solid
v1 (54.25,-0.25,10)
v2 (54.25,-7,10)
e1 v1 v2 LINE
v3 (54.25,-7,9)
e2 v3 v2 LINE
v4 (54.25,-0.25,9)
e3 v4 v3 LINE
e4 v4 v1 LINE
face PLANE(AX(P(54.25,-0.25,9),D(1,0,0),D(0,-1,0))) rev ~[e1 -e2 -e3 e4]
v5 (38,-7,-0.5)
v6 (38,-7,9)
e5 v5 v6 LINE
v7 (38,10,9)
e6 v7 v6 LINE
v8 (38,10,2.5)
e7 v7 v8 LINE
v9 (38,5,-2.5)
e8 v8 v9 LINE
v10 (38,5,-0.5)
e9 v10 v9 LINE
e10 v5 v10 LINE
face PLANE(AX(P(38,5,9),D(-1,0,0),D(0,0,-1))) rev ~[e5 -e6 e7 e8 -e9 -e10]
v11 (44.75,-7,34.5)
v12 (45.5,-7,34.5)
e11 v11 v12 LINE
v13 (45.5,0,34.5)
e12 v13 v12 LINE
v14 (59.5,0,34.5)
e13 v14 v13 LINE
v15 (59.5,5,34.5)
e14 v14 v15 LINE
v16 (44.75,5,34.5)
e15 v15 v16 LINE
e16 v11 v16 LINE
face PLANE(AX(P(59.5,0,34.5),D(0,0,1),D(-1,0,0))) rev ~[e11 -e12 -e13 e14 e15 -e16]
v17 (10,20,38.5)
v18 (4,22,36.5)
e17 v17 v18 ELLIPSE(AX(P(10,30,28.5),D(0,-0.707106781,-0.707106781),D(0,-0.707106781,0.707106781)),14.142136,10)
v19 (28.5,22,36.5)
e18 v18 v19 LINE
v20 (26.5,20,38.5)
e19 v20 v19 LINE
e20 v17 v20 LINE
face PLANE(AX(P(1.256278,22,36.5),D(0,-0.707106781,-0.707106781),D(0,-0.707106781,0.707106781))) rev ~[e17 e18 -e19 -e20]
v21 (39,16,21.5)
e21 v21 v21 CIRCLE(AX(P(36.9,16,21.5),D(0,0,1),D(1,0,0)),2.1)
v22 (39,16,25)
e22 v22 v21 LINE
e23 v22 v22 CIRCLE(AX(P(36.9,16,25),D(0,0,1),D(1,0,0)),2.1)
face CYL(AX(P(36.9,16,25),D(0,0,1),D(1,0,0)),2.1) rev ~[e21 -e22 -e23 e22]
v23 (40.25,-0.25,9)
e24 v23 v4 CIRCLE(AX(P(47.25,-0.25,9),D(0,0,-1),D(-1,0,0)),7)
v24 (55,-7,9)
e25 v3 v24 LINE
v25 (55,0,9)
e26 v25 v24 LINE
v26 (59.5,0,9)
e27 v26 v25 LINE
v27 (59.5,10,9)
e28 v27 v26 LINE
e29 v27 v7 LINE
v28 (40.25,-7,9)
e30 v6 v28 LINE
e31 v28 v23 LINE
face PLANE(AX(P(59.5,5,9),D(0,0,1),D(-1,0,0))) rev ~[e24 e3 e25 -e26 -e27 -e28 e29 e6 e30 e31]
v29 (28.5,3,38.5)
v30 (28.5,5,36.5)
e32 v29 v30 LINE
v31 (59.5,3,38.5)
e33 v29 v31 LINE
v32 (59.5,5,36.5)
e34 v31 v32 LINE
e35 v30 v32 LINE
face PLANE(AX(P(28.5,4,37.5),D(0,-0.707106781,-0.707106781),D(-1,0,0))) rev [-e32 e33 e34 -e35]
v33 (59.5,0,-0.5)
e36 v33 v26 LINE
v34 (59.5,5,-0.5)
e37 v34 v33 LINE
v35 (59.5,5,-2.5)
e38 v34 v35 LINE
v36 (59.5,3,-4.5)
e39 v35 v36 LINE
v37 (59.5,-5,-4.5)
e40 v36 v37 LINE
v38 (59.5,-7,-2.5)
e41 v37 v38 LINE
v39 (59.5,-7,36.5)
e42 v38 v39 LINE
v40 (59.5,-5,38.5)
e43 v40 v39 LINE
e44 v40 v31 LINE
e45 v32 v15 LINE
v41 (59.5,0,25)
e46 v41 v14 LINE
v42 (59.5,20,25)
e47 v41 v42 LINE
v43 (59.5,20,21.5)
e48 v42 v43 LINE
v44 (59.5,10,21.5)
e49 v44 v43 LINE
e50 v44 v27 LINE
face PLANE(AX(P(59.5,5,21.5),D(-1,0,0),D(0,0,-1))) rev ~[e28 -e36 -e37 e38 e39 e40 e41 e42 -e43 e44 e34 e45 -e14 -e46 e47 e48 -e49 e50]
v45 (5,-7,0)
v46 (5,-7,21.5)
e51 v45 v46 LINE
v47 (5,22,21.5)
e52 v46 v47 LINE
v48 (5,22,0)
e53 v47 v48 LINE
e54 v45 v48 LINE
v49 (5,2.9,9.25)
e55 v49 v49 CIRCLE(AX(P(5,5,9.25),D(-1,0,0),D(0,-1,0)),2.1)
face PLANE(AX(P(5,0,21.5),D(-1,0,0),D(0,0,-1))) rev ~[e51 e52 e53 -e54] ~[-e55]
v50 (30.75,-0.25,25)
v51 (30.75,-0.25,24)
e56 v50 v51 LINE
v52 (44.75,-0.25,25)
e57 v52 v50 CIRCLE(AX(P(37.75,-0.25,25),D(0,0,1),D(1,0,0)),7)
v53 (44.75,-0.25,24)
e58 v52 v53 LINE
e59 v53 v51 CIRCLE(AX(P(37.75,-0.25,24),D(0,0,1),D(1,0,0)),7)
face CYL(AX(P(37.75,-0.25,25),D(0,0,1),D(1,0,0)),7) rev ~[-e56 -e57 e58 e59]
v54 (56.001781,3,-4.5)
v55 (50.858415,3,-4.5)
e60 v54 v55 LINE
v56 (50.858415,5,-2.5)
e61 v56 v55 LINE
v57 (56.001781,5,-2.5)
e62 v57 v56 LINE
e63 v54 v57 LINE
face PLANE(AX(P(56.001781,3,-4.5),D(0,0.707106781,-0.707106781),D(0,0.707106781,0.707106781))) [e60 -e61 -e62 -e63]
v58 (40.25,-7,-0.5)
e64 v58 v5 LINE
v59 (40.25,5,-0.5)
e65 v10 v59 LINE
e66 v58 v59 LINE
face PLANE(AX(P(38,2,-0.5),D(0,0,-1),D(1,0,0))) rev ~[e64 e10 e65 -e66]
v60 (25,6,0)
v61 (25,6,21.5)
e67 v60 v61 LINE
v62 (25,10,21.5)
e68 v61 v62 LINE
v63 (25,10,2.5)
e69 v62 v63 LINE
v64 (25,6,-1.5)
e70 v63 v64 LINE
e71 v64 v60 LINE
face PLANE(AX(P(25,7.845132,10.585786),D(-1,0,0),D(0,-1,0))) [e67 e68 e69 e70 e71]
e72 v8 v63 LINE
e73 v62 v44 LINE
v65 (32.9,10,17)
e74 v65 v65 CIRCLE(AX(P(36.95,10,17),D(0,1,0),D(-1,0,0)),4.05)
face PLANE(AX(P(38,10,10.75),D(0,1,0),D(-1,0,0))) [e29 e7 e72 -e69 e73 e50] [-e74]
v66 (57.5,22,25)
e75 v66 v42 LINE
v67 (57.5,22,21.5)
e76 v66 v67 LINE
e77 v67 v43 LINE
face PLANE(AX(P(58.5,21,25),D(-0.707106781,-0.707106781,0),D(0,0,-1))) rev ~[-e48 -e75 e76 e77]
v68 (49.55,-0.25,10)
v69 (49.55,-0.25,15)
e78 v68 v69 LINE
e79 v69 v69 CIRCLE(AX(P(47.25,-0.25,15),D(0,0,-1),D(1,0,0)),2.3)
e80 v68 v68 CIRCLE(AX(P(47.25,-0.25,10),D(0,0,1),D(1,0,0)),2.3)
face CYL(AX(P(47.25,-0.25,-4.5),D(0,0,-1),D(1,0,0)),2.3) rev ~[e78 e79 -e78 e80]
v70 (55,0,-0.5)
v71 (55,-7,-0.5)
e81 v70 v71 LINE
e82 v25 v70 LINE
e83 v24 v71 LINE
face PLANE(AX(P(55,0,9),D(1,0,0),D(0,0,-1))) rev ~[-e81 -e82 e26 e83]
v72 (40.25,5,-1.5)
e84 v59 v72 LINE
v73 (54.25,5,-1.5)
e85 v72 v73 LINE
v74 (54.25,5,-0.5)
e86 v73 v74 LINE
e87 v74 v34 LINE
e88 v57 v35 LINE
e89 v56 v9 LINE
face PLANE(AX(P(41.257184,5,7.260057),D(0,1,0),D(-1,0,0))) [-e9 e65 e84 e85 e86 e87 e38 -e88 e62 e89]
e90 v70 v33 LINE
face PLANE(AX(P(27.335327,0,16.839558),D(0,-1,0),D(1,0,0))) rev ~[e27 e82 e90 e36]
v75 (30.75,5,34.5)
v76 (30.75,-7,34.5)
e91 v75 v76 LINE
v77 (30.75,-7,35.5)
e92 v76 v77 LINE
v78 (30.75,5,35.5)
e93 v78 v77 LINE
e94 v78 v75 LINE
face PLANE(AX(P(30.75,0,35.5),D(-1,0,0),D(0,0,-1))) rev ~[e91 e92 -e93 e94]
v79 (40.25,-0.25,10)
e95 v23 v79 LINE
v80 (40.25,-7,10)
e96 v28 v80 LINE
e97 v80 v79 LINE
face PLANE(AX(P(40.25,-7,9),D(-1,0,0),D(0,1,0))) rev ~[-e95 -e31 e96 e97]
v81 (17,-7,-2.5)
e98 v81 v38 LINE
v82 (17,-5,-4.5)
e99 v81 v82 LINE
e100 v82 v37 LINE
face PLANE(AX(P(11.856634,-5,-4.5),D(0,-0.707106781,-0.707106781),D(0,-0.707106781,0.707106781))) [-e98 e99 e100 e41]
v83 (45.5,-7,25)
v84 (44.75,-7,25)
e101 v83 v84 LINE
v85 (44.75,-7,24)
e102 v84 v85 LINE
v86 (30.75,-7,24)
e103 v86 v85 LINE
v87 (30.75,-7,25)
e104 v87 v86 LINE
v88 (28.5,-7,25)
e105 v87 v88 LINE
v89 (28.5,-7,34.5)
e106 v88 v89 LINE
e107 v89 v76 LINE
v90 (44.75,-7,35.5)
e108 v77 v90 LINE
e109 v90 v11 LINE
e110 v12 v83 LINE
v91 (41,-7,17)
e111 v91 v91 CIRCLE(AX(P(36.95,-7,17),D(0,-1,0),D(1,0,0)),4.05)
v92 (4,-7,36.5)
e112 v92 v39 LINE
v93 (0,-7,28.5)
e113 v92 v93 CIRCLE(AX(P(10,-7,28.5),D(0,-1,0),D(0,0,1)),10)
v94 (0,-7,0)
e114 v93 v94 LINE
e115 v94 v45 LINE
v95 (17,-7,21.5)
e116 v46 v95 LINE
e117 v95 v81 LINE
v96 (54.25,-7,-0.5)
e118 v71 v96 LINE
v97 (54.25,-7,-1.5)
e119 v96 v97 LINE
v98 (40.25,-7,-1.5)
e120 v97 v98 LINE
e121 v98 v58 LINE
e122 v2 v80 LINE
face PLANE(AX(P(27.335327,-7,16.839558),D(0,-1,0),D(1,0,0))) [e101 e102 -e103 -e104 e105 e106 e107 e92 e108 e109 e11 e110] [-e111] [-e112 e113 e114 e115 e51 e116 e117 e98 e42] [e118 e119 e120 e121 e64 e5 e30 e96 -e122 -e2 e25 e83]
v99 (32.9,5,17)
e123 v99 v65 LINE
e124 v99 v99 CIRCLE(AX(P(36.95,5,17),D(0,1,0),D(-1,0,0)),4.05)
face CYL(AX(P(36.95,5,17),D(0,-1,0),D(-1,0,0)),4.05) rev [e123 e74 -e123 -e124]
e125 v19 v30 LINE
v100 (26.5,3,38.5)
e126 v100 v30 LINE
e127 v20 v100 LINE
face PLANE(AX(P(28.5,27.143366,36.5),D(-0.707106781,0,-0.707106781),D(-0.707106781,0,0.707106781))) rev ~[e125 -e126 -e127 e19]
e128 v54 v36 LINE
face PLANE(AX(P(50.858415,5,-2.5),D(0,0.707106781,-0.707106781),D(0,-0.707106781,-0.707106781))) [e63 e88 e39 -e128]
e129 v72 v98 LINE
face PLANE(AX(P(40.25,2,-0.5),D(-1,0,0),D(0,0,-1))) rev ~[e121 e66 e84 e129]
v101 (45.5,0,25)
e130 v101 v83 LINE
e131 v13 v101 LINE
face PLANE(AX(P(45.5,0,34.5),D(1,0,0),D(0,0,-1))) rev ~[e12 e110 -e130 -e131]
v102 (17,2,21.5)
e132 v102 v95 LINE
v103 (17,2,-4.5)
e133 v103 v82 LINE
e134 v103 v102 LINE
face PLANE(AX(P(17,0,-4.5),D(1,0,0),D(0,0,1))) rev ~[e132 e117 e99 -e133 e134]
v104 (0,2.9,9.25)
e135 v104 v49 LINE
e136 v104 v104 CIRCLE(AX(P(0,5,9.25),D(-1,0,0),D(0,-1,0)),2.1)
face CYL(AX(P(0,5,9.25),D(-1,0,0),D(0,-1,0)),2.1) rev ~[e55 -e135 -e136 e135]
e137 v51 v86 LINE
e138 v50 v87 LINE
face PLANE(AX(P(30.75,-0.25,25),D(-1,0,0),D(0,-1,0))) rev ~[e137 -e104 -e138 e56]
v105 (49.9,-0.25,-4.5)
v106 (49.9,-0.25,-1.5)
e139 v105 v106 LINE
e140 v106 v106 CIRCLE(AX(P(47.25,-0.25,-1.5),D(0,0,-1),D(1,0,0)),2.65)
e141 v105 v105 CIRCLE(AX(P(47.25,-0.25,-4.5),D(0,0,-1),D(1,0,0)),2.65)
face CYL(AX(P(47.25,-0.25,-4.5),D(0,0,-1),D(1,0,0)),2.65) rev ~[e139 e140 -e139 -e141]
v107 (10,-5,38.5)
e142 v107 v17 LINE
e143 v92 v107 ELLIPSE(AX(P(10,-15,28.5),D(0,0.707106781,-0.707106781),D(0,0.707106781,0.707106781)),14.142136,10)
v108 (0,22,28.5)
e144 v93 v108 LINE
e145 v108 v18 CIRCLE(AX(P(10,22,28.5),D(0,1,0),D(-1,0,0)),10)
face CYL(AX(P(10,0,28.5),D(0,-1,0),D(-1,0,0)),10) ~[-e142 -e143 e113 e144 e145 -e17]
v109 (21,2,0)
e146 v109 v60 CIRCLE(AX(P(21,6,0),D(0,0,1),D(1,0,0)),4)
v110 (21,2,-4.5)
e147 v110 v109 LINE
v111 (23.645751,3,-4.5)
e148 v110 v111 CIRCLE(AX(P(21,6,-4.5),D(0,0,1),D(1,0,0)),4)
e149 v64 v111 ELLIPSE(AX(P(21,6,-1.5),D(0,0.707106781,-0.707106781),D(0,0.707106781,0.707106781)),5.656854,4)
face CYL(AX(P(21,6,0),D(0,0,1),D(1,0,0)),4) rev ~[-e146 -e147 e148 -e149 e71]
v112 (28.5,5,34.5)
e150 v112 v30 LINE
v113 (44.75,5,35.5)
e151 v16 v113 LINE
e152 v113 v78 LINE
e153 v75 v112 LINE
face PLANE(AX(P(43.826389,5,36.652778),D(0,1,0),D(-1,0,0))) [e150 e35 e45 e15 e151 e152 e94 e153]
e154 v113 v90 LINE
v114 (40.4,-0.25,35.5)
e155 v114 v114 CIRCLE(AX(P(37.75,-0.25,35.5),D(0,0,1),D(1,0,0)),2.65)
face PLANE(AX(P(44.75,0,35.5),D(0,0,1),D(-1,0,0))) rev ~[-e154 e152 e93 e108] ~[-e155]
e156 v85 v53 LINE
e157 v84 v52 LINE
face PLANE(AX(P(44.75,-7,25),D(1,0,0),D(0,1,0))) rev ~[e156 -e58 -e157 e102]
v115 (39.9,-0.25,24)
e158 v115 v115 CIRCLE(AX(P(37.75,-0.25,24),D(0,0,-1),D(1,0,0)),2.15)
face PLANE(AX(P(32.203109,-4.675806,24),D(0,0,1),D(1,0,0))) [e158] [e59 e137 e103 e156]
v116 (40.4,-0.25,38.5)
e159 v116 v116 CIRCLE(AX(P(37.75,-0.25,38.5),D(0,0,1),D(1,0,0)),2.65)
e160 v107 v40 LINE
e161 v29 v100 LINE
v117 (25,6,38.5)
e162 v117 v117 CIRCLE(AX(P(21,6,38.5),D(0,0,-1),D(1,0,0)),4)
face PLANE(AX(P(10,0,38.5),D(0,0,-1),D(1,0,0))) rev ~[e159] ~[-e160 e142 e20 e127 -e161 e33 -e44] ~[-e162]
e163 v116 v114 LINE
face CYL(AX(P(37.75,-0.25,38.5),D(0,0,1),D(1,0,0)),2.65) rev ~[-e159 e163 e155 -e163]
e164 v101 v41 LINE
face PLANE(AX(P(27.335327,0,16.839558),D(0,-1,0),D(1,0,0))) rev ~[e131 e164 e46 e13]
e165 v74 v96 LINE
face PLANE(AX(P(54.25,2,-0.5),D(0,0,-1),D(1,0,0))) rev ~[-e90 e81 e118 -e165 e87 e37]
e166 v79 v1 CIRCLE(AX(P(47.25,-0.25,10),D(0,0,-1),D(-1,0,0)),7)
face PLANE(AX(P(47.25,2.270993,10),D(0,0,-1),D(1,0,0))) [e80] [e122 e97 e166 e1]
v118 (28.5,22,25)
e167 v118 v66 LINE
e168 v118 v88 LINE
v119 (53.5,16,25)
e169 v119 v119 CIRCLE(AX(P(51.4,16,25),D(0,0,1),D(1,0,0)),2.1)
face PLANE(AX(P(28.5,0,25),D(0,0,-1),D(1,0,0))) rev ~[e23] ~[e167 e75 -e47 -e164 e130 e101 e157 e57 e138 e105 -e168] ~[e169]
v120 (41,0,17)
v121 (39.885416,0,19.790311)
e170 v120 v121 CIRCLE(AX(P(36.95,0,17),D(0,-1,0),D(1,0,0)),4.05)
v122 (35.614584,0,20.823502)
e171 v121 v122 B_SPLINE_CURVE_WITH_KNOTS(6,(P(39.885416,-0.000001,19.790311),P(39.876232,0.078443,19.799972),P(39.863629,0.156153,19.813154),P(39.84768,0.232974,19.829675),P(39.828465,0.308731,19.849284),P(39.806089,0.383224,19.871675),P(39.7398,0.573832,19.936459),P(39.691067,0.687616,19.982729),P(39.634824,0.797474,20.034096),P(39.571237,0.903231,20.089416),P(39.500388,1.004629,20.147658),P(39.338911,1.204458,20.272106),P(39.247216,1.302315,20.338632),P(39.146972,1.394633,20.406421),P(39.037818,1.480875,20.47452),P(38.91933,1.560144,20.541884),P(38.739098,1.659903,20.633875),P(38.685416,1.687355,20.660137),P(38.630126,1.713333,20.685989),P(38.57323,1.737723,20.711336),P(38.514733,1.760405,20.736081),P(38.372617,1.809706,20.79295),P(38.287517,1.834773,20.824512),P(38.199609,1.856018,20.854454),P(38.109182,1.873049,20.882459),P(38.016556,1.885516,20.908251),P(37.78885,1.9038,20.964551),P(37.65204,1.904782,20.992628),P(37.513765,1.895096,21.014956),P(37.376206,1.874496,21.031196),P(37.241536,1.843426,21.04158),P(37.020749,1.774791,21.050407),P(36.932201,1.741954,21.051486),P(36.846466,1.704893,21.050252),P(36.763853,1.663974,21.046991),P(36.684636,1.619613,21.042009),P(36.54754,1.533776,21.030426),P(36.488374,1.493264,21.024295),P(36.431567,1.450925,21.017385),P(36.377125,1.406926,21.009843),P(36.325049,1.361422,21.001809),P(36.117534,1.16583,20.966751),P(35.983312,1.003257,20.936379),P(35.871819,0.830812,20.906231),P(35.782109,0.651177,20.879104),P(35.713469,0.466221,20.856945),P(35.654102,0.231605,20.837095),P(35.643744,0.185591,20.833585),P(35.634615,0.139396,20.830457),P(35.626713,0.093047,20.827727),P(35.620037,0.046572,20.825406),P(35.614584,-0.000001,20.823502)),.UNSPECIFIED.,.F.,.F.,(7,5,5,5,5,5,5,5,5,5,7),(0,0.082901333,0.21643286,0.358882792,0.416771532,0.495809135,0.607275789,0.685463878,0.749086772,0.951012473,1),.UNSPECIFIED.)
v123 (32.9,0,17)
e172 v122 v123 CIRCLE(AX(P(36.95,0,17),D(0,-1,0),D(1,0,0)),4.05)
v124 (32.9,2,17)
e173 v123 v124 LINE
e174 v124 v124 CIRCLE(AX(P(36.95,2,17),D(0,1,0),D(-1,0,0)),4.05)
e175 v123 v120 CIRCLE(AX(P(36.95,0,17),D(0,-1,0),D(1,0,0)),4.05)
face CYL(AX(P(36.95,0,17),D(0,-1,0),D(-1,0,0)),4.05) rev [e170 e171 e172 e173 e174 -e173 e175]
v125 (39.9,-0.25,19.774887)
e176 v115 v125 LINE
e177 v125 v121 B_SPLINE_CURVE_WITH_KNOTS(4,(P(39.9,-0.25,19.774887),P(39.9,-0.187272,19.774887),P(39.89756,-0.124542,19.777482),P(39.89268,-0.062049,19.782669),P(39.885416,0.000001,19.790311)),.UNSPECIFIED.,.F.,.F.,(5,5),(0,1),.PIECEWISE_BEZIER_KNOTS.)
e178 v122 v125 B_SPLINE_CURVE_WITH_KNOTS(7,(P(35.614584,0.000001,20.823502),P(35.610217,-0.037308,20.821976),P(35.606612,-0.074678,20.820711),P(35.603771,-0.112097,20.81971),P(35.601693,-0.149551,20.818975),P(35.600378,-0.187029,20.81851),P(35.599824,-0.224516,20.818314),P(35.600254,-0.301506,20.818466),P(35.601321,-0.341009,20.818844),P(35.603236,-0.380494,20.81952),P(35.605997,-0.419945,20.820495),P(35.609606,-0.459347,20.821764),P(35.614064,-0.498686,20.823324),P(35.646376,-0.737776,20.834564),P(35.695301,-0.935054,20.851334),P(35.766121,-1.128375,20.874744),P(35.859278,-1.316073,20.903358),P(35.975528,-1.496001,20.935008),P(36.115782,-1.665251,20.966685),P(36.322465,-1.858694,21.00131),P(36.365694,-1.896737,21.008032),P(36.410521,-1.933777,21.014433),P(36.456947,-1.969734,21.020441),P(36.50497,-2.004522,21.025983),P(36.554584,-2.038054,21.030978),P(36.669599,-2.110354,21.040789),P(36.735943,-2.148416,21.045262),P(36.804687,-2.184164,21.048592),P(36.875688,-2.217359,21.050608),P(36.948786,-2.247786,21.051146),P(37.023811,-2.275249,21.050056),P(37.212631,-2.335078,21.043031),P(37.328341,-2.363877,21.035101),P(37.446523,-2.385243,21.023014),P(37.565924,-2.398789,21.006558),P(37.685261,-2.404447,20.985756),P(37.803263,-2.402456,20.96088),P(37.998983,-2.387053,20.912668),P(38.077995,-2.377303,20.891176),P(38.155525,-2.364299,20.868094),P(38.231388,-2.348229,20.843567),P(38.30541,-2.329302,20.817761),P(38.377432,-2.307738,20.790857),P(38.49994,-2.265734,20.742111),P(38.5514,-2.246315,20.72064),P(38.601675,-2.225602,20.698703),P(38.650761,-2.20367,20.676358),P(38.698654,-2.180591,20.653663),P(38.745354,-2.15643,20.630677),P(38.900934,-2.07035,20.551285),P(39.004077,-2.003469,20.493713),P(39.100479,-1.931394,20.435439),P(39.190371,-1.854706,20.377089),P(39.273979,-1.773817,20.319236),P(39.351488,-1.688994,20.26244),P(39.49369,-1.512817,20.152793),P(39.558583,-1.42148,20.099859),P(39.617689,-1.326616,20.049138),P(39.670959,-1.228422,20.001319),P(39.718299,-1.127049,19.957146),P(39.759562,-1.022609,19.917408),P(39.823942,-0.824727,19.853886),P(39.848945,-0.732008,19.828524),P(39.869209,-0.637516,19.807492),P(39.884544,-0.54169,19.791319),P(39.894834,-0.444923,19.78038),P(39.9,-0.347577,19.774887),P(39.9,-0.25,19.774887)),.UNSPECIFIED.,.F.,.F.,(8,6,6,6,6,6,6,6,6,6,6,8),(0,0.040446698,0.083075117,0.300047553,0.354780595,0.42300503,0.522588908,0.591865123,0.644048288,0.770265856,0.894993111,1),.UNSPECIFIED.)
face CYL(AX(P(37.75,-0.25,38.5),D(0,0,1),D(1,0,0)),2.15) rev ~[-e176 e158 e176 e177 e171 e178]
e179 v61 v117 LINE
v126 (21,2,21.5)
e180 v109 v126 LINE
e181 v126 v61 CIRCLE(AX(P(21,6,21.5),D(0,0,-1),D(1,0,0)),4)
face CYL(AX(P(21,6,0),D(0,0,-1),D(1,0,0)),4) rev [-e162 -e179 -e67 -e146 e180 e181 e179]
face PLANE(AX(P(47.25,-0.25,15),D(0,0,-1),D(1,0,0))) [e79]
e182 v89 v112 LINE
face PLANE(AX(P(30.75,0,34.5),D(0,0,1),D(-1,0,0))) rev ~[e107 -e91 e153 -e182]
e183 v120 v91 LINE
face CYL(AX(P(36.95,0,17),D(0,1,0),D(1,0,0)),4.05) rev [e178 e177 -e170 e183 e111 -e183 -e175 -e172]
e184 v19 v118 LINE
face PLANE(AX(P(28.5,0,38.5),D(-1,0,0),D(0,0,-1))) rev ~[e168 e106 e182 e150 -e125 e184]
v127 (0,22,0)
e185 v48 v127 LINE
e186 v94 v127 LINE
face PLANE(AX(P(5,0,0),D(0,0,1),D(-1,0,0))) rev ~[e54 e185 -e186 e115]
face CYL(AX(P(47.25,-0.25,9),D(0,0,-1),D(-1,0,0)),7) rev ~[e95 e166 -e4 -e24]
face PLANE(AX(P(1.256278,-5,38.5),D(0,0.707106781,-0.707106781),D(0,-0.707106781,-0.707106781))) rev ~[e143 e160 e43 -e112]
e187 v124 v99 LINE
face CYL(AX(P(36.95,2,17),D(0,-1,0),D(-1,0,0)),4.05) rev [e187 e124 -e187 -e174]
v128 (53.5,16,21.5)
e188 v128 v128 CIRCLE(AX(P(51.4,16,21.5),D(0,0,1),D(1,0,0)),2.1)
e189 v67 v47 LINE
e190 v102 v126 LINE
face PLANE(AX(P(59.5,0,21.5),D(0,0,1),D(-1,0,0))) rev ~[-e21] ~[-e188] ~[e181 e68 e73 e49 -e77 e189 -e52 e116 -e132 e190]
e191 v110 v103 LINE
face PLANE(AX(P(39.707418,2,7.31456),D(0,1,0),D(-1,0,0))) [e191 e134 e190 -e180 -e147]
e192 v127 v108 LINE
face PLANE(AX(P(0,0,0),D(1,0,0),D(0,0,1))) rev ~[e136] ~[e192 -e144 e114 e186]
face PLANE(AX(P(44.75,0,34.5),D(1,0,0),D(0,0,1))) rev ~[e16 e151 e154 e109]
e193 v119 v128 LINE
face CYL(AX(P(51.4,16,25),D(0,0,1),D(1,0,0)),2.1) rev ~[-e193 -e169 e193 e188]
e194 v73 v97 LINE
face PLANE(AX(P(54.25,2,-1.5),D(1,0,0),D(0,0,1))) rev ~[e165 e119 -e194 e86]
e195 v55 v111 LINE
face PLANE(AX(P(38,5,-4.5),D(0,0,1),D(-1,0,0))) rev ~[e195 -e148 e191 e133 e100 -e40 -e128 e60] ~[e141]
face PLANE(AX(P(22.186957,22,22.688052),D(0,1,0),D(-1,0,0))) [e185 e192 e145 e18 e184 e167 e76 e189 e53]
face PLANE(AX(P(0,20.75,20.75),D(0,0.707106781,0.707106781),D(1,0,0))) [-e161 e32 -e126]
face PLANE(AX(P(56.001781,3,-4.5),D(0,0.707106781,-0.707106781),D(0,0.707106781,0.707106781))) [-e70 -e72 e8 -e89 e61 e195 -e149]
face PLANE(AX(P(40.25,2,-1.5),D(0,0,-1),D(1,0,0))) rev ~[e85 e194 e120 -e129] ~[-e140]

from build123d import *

# Parameters (mm, degrees)
F0_R           = 4.05
F1_DEPTH       = 7
F2_T1_DEPTH    = 63.387088135
F2_T3_DEPTH    = 52.7867319519
F4_DEPTH       = 22
F6_DEPTH       = 5
F7_R           = 4.05
F8_DEPTH       = 2
F9_R           = 4.05
F10_DEPTH      = 3
F11_R          = 4.05
F12_DEPTH      = 5
F13_T4_DEPTH   = 53.0035618315
F14_SIZE       = 2
F17_DEPTH      = 4
F15_R          = 4
F18_DEPTH      = 4.501
F18_DEPTH_BACK = 38.501
F19_R          = 2.3
F20_DEPTH      = 19.5
F21_R          = 2.65
F21_R_2        = 2.3
F22_DEPTH      = 3
F23_R          = 2.15
F24_DEPTH      = 22
F25_R          = 2.65
F25_R_2        = 2.15
F26_DEPTH      = 3
F28_DEPTH      = 1
F30_DEPTH      = 1
F31_R          = 2.1
F32_DEPTH      = 29.501
F33_T1_DEPTH   = 32.387088135
F33_T3_DEPTH   = 13.7849510361
F33_T8_DEPTH   = 29.2867319519
F34_R          = 2.1
F35_DEPTH      = 5


# Not quite as in the source:
# - a fillet or chamfer that OpenCascade refuses, or shapes differently, is made with other operations: its cross-section is extruded or revolved along the edge and cut away or added


with BuildPart() as f1:
    # F0 (on Front) → F1 (new body)
    with BuildSketch(Plane.XZ):
        with BuildLine():
            Line((0, 28.5), (0, 0))
            Line((0, 0), (5, 0))
            Line((5, 0), (5, 21.5))
            Line((5, 21.5), (17, 21.5))
            Line((17, 21.5), (17, -4.5))
            Line((17, -4.5), (59.5, -4.5))
            Line((59.5, -4.5), (59.5, 38.5))
            Line((59.5, 38.5), (10, 38.5))
            ThreePointArc((10, 38.5), (2.9289321881, 35.5710678119), (0, 28.5))
        make_face()
        Polygon((38, -0.5), (38, 9), (55, 9), (55, -0.5), (54.25, -0.5), (54.25, -1.5), (40.25, -1.5), (40.25, -0.5), align=None, mode=Mode.SUBTRACT)
        with Locations((36.95, 17)):
            Circle(F0_R, mode=Mode.SUBTRACT)
        Polygon((28.5, 25), (28.5, 34.5), (30.75, 34.5), (30.75, 35.5), (44.75, 35.5), (44.75, 34.5), (45.5, 34.5), (45.5, 25), align=None, mode=Mode.SUBTRACT)
    extrude(amount=F1_DEPTH)

    # F2: chamfer of 2 on 2 edges, made by hand

    # F2_s2 → F2_t1 (cut)
    with BuildSketch(Plane.YZ.offset(1.2562778409)):
        Polygon((-5, 38.5), (-7, 36.5), (-7, 38.5), align=None)
    extrude(amount=F2_T1_DEPTH, mode=Mode.SUBTRACT)

    # F2_s4 → F2_t3 (cut)
    with BuildSketch(Plane.YZ.offset(11.8566340241)):
        Polygon((-5, -4.5), (-7, -2.5), (-7, -4.5), align=None)
    extrude(amount=F2_T3_DEPTH, mode=Mode.SUBTRACT)

    # F3 (on face) → F4 (join)
    with BuildSketch(Plane(origin=(0, 0, 0), x_dir=(-1, 0, 0), z_dir=(0, 1, 0))):
        with BuildLine():
            Line((-59.5, 21.5), (-17, 21.5))
            Line((-17, 21.5), (-5, 21.5))
            Line((-5, 21.5), (-5, 0))
            Line((-5, 0), (0, 0))
            Line((0, 0), (0, 28.5))
            ThreePointArc((0, 28.5), (-2.9289321881, 35.5710678119), (-10, 38.5))
            Line((-10, 38.5), (-28.5, 38.5))
            Line((-28.5, 38.5), (-28.5, 34.5))
            Line((-28.5, 34.5), (-28.5, 25))
            Line((-28.5, 25), (-45.5, 25))
            Line((-45.5, 25), (-59.5, 25))
            Line((-59.5, 25), (-59.5, 21.5))
        make_face()
    extrude(amount=F4_DEPTH)

    # F5 (on face) → F6 (join)
    with BuildSketch(Plane(origin=(0, 0, 0), x_dir=(-1, 0, 0), z_dir=(0, 1, 0))):
        Polygon((-30.75, 34.5), (-28.5, 34.5), (-28.5, 38.5), (-59.5, 38.5), (-59.5, 34.5), (-45.5, 34.5), (-44.75, 34.5), (-44.75, 35.5), (-30.75, 35.5), align=None)
    extrude(amount=F6_DEPTH)

    # F7 (on face) → F8 (join)
    with BuildSketch(Plane(origin=(0, 0, 0), x_dir=(-1, 0, 0), z_dir=(0, 1, 0))):
        Polygon((-38, 9), (-38, -0.5), (-40.25, -0.5), (-40.25, -1.5), (-54.25, -1.5), (-54.25, -0.5), (-55, -0.5), (-59.5, -0.5), (-59.5, -4.5), (-17, -4.5), (-17, 21.5), (-59.5, 21.5), (-59.5, 9), (-55, 9), align=None)
        with Locations((-36.95, 17)):
            Circle(F7_R, mode=Mode.SUBTRACT)
    extrude(amount=F8_DEPTH)

    # F9 (on face) → F10 (join)
    with BuildSketch(Plane(origin=(0, 2, 0), x_dir=(-1, 0, 0), z_dir=(0, 1, 0))):
        Polygon((-21, -4.5), (-21, 21.5), (-59.5, 21.5), (-59.5, 9), (-38, 9), (-38, -0.5), (-40.25, -0.5), (-40.25, -1.5), (-54.25, -1.5), (-54.25, -0.5), (-59.5, -0.5), (-59.5, -4.5), align=None)
        with Locations((-36.95, 17)):
            Circle(F9_R, mode=Mode.SUBTRACT)
    extrude(amount=F10_DEPTH)

    # F11 (on face) → F12 (join)
    with BuildSketch(Plane(origin=(0, 5, 0), x_dir=(-1, 0, 0), z_dir=(0, 1, 0))):
        Polygon((-38, 9), (-38, -0.5), (-38, -4.5), (-21, -4.5), (-21, 21.5), (-59.5, 21.5), (-59.5, 9), align=None)
        with Locations((-36.95, 17)):
            Circle(F11_R, mode=Mode.SUBTRACT)
    extrude(amount=F12_DEPTH)

    # F13: chamfer of 7 on 1 edges, made by hand


with BuildPart() as f13_tool2:
    # F13_s3 → F13_t4 (new body)
    with BuildSketch(Plane.YZ.offset(56.0017809158)):
        Polygon((3, -4.5), (10, 2.5), (10, -4.5), align=None)
    extrude(amount=-F13_T4_DEPTH)

    split(bisect_by=Plane.YZ.offset(5), keep=Keep.TOP)


with BuildPart() as f1_1:
    add(f1.part)

    # F13_t1: cut F13_tool2
    add(f13_tool2.part, mode=Mode.SUBTRACT)

    # F14
    f14_edges = [f1_1.edges().sort_by_distance(p)[0] for p in [
        (44, 5, 38.5),
        (59.5, 22, 23.25),
    ]]
    chamfer(f14_edges, length=F14_SIZE)

    # F16 (on face) → F17 (cut)
    with BuildSketch(Plane(origin=(21, 0, 0), x_dir=(0, -1, 0), z_dir=(-1, 0, 0))):
        Polygon((-6, 21.5), (-10, 21.5), (-10, 2.5), (-6, -1.5), align=None)
    extrude(amount=-F17_DEPTH, mode=Mode.SUBTRACT)

    # F15 (on Top) → F18 (cut, two sides)
    with BuildSketch(Plane.XY) as f18_sk:
        with Locations((21, 6)):
            Circle(F15_R)
    extrude(amount=-F18_DEPTH, mode=Mode.SUBTRACT)
    extrude(f18_sk.sketch, amount=F18_DEPTH_BACK, mode=Mode.SUBTRACT)

    # F19 (on face) → F20 (cut)
    with BuildSketch(Plane(origin=(0, 0, -4.5), x_dir=(1, 0, 0), z_dir=(0, 0, -1))):
        with Locations((47.25, 0.25)):
            Circle(F19_R)
    extrude(amount=-F20_DEPTH, mode=Mode.SUBTRACT)

    # F21 (on face) → F22 (cut, through all)
    with BuildSketch(Plane(origin=(0, 0, -4.5), x_dir=(1, 0, 0), z_dir=(0, 0, -1))):
        with Locations((47.25, 0.25)):
            Circle(F21_R)
        with Locations((47.25, 0.25)):
            Circle(F21_R_2, mode=Mode.SUBTRACT)
    extrude(amount=-F22_DEPTH, mode=Mode.SUBTRACT)

    # F23 (on face) → F24 (cut)
    with BuildSketch(Plane.XY.offset(38.5)):
        with Locations((37.75, -0.25)):
            Circle(F23_R)
    extrude(amount=-F24_DEPTH, mode=Mode.SUBTRACT)

    # F25 (on face) → F26 (cut, through all)
    with BuildSketch(Plane.XY.offset(38.5)):
        with Locations((37.75, -0.25)):
            Circle(F25_R)
        with Locations((37.75, -0.25)):
            Circle(F25_R_2, mode=Mode.SUBTRACT)
    extrude(amount=-F26_DEPTH, mode=Mode.SUBTRACT)

    # F27 (on face) → F28 (cut)
    with BuildSketch(Plane.XY.offset(25)):
        with BuildLine():
            ThreePointArc((35.8959503782, -7), (32.1832079546, -4.4939163898), (30.75, -0.25))
            Line((30.75, -0.25), (30.75, -7))
            Line((30.75, -7), (35.8959503782, -7))
        make_face()
        with BuildLine():
            ThreePointArc((39.6040496218, -7), (43.3167920454, -4.4939163898), (44.75, -0.25))
            Line((44.75, -0.25), (39.9, -0.25))
            ThreePointArc((39.9, -0.25), (37.75, -2.4), (35.6, -0.25))
            Line((35.6, -0.25), (30.75, -0.25))
            ThreePointArc((30.75, -0.25), (32.1832079546, -4.4939163898), (35.8959503782, -7))
            Line((35.8959503782, -7), (39.6040496218, -7))
        make_face()
        with BuildLine():
            Line((39.9, -0.25), (44.75, -0.25))
            ThreePointArc((44.75, -0.25), (37.75, 6.75), (30.75, -0.25))
            Line((30.75, -0.25), (35.6, -0.25))
            ThreePointArc((35.6, -0.25), (37.75, 1.9), (39.9, -0.25))
        make_face()
        with BuildLine():
            Line((44.75, -7), (44.75, -0.25))
            ThreePointArc((44.75, -0.25), (43.3167920454, -4.4939163898), (39.6040496218, -7))
            Line((39.6040496218, -7), (44.75, -7))
        make_face()
    extrude(amount=-F28_DEPTH, mode=Mode.SUBTRACT)

    # F29 (on face) → F30 (cut)
    with BuildSketch(Plane(origin=(0, 0, 9), x_dir=(1, 0, 0), z_dir=(0, 0, -1))):
        with BuildLine():
            Line((44.95, 0.25), (40.25, 0.25))
            ThreePointArc((40.25, 0.25), (47.25, -6.75), (54.25, 0.25))
            Line((54.25, 0.25), (49.55, 0.25))
            ThreePointArc((49.55, 0.25), (47.25, -2.05), (44.95, 0.25))
        make_face()
        with BuildLine():
            ThreePointArc((45.3959503782, 7), (41.6832079546, 4.4939163898), (40.25, 0.25))
            Line((40.25, 0.25), (44.95, 0.25))
            ThreePointArc((44.95, 0.25), (47.25, 2.55), (49.55, 0.25))
            Line((49.55, 0.25), (54.25, 0.25))
            ThreePointArc((54.25, 0.25), (52.8167920454, 4.4939163898), (49.1040496218, 7))
            Line((49.1040496218, 7), (45.3959503782, 7))
        make_face()
        with BuildLine():
            Line((40.25, 7), (40.25, 0.25))
            ThreePointArc((40.25, 0.25), (41.6832079546, 4.4939163898), (45.3959503782, 7))
            Line((45.3959503782, 7), (40.25, 7))
        make_face()
        with BuildLine():
            ThreePointArc((49.1040496218, 7), (52.8167920454, 4.4939163898), (54.25, 0.25))
            Line((54.25, 0.25), (54.25, 7))
            Line((54.25, 7), (49.1040496218, 7))
        make_face()
    extrude(amount=-F30_DEPTH, mode=Mode.SUBTRACT)

    # F31 (on face) → F32 (cut, through all)
    with BuildSketch(Plane.XY.offset(25)):
        with Locations((36.9, 16)):
            Circle(F31_R)
        with Locations((51.4, 16)):
            Circle(F31_R)
    extrude(amount=-F32_DEPTH, mode=Mode.SUBTRACT)

    # F33: chamfer of 2 on 3 edges, made by hand

    # F33_s2 → F33_t1 (cut)
    with BuildSketch(Plane.YZ.offset(1.2562778409)):
        Polygon((22, 36.5), (20, 38.5), (22, 38.5), align=None)
    extrude(amount=F33_T1_DEPTH, mode=Mode.SUBTRACT)

    # F33_s4 → F33_t3 (cut)
    with BuildSketch(Plane.YZ.offset(50.8584149398)):
        Polygon((5, -2.5), (3, -4.5), (5, -4.5), align=None)
    extrude(amount=F33_T3_DEPTH, mode=Mode.SUBTRACT)


with BuildPart() as f33_tool6:
    # F33_s7 → F33_t8 (new body)
    with BuildSketch(Plane.XZ.offset(-27.1433659759)):
        Polygon((28.5, 36.5), (26.5, 38.5), (28.5, 38.5), align=None)
    extrude(amount=F33_T8_DEPTH)

    split(bisect_by=Plane(origin=(0, 20.75, 20.75), x_dir=(1, 0, 0), z_dir=(0, 0.7071067812, 0.7071067812)), keep=Keep.TOP)


with BuildPart() as f1_2:
    add(f1_1.part)

    # F33_t5: cut F33_tool6
    add(f33_tool6.part, mode=Mode.SUBTRACT)

    # F34 (on face) → F35 (cut, through all)
    with BuildSketch(Plane(origin=(0, 0, 0), x_dir=(0, -1, 0), z_dir=(-1, 0, 0))):
        with Locations((-5, 9.25)):
            Circle(F34_R)
    extrude(amount=-F35_DEPTH, mode=Mode.SUBTRACT)


solid = f1_2.part
